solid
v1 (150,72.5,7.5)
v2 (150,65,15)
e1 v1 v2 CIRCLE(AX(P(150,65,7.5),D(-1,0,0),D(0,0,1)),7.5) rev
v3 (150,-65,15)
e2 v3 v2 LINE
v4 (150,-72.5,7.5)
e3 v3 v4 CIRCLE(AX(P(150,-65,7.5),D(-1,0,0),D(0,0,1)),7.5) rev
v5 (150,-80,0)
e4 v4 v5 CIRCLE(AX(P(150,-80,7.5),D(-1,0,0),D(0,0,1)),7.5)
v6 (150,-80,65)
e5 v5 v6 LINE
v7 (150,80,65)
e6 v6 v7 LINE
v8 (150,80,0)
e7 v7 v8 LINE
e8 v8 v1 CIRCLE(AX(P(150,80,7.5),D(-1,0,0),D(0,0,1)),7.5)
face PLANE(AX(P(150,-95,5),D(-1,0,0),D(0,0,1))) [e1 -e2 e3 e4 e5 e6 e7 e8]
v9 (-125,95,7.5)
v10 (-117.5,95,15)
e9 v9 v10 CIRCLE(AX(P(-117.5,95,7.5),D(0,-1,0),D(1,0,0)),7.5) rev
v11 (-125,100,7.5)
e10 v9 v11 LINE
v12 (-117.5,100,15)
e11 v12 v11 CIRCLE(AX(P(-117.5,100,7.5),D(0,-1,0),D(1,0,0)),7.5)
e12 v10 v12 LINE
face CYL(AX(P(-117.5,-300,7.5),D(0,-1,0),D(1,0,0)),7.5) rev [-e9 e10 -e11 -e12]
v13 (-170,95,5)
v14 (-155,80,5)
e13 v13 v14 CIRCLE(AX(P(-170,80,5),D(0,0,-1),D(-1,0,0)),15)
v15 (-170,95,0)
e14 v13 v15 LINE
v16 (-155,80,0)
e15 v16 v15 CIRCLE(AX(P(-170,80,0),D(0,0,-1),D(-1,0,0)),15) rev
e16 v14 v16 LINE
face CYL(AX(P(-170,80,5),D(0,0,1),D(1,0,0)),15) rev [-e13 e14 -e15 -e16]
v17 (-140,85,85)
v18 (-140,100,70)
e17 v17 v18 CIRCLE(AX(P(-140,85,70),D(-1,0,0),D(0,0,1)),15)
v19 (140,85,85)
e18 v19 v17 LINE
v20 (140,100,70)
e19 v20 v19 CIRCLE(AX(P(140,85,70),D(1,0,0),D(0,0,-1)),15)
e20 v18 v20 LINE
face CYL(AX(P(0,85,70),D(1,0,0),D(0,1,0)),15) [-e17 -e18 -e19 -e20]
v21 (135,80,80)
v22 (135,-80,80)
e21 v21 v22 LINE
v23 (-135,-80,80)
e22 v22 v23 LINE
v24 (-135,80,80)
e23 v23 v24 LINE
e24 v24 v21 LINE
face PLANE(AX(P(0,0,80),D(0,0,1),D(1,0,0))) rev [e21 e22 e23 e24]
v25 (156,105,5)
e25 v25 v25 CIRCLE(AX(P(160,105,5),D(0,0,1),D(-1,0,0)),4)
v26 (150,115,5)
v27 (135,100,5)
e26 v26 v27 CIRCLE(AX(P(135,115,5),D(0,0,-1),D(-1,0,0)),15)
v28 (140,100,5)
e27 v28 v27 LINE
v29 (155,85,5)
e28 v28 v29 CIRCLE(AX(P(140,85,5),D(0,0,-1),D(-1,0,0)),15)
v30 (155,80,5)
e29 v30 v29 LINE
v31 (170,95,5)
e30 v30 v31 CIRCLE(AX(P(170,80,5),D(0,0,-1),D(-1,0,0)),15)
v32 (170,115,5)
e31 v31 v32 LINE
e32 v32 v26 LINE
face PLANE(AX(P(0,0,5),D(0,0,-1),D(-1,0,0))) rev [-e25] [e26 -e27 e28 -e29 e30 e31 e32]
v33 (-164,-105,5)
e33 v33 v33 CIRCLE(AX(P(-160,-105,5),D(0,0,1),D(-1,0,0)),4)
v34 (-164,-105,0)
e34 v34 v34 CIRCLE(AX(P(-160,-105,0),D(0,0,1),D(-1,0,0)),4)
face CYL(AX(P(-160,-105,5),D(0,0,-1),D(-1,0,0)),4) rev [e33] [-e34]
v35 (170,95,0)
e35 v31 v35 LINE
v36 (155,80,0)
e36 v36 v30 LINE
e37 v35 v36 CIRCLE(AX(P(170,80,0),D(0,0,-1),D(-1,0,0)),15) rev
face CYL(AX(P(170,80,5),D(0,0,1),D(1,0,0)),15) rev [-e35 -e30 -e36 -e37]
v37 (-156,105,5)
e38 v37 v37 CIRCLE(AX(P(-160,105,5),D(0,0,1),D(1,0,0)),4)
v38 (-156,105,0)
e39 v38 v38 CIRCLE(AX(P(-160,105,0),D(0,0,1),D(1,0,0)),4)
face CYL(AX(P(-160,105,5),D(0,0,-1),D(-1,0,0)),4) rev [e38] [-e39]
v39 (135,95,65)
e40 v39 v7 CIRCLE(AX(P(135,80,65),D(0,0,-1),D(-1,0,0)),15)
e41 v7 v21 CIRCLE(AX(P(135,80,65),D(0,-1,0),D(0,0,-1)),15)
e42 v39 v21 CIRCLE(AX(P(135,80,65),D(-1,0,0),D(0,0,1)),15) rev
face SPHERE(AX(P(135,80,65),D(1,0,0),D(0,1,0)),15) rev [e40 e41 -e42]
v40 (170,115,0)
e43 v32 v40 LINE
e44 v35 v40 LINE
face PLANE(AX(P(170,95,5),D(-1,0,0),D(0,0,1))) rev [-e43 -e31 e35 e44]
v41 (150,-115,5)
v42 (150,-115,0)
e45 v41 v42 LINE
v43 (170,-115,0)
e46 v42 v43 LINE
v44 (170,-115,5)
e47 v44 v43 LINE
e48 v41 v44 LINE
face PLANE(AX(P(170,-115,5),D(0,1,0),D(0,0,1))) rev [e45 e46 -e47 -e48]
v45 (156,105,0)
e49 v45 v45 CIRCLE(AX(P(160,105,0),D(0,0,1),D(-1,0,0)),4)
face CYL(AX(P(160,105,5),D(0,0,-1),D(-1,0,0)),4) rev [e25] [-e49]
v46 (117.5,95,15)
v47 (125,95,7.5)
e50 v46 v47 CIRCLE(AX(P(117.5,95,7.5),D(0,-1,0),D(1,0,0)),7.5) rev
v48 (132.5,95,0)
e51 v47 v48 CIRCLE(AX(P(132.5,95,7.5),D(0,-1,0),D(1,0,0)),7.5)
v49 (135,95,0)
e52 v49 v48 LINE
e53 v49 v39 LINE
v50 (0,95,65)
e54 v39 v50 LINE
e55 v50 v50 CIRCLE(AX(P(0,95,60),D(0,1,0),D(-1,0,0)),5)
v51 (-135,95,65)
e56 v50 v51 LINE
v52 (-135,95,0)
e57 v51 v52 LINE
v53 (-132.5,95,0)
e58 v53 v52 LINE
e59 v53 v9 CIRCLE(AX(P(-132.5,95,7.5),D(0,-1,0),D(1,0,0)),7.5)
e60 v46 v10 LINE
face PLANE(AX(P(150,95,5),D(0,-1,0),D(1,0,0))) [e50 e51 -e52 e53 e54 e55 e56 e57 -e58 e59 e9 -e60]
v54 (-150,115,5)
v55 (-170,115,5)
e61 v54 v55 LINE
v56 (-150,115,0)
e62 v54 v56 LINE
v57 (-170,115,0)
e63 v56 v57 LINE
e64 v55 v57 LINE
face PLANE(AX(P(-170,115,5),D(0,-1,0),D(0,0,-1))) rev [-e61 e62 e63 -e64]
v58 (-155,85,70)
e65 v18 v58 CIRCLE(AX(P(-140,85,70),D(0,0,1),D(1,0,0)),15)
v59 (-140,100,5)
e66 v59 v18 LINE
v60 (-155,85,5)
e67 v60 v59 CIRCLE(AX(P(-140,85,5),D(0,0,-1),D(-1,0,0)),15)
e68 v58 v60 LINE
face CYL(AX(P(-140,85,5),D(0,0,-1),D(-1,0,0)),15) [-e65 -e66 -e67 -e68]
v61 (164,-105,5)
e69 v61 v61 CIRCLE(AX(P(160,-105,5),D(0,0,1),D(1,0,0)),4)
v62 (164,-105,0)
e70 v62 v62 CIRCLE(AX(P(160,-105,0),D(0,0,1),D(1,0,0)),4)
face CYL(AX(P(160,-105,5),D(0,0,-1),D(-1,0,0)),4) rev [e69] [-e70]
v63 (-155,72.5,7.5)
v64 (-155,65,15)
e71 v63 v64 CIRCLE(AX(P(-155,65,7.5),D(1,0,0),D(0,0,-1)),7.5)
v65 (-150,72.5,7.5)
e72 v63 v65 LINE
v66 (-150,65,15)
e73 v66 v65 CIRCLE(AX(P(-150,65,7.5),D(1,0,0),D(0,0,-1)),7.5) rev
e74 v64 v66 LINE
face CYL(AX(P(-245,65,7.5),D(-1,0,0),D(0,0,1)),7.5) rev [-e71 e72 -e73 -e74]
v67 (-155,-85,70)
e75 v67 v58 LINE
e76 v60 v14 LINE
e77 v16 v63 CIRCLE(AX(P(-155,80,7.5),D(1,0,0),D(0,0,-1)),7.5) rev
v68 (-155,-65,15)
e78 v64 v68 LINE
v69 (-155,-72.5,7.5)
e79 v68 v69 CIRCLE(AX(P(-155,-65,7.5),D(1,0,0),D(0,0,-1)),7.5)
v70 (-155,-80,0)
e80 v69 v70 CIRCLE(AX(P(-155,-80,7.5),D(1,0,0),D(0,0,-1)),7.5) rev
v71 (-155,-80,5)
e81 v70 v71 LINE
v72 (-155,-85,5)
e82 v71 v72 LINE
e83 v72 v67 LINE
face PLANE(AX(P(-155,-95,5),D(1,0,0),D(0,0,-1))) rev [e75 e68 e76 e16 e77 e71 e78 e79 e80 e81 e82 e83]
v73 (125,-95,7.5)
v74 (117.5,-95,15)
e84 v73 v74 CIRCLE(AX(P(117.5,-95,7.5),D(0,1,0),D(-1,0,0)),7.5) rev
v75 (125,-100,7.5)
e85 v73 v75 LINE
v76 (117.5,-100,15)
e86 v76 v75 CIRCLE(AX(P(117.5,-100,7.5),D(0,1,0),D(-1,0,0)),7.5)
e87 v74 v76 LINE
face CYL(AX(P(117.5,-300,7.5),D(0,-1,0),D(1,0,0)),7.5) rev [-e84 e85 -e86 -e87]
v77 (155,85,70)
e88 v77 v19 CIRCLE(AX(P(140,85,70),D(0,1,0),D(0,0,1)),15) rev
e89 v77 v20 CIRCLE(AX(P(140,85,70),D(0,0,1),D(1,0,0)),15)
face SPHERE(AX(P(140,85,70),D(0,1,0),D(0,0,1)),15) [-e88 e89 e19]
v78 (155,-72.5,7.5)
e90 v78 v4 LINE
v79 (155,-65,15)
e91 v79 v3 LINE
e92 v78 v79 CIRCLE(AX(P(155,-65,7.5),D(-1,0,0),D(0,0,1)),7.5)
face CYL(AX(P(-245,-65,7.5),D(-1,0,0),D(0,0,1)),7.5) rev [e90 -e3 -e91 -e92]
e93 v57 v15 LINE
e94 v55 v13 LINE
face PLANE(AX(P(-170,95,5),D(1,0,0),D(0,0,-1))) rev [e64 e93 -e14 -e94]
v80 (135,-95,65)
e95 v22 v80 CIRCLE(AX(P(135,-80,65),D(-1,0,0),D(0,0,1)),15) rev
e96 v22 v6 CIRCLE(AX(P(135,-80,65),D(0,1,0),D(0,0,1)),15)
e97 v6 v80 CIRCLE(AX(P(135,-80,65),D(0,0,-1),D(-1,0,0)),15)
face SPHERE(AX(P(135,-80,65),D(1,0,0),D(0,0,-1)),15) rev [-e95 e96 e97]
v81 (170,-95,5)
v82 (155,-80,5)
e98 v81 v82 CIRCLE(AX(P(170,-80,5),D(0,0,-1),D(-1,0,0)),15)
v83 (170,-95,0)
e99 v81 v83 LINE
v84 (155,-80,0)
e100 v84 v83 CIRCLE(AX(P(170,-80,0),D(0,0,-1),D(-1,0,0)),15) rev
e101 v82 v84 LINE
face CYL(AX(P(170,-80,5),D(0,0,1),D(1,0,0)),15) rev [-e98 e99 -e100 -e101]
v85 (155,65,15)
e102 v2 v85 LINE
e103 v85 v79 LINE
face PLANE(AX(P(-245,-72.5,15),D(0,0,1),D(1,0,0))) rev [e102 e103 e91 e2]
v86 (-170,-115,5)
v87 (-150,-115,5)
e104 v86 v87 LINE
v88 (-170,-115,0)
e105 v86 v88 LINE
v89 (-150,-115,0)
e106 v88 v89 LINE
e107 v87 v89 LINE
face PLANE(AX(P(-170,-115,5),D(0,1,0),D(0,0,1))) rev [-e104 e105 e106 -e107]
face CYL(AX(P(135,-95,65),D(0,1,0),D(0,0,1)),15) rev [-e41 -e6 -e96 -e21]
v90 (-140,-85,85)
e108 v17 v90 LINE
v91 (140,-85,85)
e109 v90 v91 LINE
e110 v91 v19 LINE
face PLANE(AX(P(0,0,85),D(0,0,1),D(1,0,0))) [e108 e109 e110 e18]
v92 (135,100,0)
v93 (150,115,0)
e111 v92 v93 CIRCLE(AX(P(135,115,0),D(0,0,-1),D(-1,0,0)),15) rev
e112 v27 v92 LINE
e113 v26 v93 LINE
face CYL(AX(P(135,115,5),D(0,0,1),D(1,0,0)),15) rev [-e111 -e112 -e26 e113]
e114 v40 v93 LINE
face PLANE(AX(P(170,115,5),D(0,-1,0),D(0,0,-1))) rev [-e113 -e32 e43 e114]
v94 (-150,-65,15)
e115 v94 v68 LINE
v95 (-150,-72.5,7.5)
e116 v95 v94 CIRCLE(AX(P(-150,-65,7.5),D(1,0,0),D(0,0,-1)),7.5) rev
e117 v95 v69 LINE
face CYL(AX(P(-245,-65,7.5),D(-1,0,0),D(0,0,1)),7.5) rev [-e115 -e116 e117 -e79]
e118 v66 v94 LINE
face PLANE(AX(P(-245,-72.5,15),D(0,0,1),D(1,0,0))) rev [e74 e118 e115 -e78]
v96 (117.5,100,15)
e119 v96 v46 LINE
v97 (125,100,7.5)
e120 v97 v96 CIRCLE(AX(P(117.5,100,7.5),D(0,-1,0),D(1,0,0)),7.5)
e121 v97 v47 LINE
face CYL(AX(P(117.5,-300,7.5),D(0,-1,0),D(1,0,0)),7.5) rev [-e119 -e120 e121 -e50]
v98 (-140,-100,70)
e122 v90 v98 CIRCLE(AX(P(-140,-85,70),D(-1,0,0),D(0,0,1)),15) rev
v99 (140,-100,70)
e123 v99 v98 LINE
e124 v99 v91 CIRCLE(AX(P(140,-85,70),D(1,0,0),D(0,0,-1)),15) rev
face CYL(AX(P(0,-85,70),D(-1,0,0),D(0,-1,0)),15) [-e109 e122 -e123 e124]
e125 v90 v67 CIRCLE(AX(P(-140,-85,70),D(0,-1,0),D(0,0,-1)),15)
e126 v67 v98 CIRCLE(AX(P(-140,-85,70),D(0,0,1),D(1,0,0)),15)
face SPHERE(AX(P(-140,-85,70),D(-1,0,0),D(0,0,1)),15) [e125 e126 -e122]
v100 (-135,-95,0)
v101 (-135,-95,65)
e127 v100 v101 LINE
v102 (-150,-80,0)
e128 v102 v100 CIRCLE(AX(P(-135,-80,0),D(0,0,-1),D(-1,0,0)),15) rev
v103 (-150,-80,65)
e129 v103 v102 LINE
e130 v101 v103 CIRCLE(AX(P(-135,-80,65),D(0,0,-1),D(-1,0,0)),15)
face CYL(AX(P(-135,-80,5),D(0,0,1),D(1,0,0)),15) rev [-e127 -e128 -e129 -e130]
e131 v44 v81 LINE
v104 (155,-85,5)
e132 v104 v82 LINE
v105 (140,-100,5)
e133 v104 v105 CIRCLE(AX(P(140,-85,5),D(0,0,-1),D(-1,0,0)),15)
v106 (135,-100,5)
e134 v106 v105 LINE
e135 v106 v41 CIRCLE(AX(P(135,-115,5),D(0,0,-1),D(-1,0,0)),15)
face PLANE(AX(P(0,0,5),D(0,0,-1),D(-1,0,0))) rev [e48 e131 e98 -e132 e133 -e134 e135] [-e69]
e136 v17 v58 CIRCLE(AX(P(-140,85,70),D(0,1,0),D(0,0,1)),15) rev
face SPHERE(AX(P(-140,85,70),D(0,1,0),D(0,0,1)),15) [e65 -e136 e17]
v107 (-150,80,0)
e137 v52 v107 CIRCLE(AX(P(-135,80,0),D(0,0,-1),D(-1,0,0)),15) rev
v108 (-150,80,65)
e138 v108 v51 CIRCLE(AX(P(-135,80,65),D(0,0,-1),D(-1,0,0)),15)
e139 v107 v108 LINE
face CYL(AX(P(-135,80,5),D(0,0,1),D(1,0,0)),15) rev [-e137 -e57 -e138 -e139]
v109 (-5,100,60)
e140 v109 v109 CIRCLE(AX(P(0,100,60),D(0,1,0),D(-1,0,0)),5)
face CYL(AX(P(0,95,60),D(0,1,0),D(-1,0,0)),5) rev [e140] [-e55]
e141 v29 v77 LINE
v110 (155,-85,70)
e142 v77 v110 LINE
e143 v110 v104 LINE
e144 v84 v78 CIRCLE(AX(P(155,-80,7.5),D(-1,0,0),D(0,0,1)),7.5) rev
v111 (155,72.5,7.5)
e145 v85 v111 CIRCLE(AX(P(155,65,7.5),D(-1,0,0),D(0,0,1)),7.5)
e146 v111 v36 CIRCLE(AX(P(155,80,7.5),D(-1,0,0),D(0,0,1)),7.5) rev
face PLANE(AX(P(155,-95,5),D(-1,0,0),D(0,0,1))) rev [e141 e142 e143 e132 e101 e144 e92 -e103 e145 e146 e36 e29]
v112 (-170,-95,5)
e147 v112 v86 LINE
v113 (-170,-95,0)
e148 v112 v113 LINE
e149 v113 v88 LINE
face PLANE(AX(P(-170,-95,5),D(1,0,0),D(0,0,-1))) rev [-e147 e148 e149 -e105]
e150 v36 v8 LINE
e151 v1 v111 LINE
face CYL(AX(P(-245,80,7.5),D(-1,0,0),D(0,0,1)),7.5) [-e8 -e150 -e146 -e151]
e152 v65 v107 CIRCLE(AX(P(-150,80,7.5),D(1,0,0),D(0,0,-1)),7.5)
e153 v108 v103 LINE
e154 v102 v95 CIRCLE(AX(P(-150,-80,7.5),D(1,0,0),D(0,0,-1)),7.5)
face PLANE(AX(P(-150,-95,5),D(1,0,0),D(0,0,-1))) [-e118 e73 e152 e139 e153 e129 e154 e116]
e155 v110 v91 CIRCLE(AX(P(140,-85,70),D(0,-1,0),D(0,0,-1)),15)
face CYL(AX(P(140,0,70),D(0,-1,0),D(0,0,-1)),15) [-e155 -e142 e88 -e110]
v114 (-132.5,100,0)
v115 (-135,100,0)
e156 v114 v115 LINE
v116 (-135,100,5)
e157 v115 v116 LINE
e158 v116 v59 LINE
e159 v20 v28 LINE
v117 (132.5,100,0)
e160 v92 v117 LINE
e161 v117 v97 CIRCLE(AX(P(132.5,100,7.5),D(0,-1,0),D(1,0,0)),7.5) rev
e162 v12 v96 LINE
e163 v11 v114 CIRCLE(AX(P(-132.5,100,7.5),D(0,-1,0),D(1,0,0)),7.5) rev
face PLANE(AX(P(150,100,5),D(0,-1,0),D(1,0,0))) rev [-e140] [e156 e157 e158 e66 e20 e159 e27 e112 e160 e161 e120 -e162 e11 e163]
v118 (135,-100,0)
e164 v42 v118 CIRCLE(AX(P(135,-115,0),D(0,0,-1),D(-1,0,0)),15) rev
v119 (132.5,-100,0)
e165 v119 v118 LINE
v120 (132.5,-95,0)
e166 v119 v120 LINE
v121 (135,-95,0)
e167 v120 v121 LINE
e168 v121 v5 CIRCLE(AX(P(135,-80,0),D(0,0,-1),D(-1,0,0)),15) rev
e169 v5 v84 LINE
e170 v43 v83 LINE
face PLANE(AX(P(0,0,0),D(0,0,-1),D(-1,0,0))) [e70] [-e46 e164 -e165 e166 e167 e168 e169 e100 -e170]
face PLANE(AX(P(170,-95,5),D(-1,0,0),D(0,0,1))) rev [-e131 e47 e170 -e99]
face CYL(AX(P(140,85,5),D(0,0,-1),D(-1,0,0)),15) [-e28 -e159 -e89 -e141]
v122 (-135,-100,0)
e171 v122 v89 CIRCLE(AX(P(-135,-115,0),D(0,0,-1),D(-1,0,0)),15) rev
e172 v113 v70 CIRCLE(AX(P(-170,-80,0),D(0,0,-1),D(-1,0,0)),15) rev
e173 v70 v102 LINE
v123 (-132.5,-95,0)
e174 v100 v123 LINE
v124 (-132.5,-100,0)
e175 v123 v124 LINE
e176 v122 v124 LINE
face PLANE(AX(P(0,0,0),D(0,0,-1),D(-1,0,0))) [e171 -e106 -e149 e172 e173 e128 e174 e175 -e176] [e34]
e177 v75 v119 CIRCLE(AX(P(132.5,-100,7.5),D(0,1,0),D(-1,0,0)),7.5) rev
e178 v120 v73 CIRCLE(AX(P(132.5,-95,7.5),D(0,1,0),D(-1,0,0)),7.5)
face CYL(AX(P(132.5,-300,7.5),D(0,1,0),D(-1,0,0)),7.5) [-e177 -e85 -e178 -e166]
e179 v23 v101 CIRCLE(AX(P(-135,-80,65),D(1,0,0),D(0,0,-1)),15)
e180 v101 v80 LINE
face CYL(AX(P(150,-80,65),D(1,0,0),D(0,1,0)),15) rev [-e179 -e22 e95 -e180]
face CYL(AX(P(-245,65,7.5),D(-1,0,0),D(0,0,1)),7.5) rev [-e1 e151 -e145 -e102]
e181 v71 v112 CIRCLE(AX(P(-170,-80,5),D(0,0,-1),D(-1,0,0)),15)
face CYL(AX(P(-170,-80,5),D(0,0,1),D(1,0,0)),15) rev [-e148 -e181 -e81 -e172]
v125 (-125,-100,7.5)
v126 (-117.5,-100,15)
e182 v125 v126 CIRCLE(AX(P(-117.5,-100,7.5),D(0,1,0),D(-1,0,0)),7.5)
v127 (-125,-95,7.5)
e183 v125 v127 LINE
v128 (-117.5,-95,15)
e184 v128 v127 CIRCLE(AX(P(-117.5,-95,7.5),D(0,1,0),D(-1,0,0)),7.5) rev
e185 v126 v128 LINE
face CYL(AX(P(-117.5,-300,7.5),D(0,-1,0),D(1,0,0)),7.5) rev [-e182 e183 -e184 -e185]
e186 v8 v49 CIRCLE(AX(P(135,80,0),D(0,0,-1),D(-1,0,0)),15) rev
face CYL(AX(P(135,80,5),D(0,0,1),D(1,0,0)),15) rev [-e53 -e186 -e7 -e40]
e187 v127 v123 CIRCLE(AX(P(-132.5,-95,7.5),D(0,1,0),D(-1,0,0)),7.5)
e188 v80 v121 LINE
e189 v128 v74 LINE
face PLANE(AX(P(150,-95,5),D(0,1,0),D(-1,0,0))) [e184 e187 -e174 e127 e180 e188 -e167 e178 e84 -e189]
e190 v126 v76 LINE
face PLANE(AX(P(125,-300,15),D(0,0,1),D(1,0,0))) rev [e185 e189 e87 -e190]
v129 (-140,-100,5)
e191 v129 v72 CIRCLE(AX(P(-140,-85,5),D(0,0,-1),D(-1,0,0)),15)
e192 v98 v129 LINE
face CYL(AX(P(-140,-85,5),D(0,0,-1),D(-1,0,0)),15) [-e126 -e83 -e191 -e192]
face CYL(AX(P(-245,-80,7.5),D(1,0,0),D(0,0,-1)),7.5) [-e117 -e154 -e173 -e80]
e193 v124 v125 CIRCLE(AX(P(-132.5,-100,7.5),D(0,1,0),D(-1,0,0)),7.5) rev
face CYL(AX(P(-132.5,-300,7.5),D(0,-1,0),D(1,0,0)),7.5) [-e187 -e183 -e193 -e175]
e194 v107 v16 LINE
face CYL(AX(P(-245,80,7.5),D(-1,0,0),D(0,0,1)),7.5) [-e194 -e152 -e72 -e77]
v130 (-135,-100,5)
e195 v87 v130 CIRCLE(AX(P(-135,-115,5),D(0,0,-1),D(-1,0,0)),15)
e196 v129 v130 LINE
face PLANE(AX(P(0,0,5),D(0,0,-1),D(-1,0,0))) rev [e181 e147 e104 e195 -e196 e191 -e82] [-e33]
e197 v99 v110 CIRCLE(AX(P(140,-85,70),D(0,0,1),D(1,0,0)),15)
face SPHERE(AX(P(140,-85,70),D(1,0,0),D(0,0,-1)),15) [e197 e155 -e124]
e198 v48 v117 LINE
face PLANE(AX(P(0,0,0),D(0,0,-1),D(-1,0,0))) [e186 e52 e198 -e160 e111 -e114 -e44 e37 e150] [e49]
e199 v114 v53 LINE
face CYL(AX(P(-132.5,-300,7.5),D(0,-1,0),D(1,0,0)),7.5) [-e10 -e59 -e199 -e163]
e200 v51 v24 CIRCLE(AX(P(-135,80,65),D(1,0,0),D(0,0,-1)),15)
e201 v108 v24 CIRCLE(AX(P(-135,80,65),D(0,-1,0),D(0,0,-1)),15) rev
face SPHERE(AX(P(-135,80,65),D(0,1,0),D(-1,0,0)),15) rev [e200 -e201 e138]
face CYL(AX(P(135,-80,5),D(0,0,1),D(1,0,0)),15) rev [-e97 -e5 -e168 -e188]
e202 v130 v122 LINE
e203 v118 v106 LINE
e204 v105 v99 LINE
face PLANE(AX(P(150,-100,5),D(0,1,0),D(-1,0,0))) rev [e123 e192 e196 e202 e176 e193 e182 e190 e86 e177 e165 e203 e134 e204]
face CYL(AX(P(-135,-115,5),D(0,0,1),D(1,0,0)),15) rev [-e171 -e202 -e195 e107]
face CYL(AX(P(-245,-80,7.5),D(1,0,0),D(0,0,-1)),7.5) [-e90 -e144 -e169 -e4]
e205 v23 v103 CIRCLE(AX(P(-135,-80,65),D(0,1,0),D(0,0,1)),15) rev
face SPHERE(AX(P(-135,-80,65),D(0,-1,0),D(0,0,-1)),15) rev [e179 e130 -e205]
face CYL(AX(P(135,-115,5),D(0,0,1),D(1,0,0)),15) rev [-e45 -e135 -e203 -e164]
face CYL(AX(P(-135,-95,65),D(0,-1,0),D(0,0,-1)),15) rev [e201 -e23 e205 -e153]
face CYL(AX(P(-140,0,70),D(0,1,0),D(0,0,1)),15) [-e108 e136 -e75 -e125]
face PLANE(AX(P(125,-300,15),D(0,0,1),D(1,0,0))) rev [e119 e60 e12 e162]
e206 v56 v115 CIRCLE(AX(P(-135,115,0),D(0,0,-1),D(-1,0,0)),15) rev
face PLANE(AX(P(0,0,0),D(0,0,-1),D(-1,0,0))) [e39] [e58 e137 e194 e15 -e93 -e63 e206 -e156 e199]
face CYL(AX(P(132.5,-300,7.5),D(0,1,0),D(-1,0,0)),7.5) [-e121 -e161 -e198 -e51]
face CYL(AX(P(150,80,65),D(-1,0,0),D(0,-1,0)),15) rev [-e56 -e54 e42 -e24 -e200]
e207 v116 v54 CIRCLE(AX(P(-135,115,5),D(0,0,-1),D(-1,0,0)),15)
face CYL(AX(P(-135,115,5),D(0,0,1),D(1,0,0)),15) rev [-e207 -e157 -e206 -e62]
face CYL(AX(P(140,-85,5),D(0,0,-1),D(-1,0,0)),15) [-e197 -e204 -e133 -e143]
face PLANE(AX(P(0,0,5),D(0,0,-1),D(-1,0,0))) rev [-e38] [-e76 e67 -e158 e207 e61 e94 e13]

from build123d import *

# Parameters (mm, degrees)
SKETCH2_R           = 4
SKETCH2_W           = 300
SKETCH2_H           = 190
BOSS_EXTRUDE1_DEPTH = 5
SKETCH3_W           = 310
SKETCH3_H           = 200
SKETCH3_W_2         = 300
SKETCH3_H_2         = 190
BOSS_EXTRUDE2_DEPTH = 75
SKETCH4_W           = 310
SKETCH4_H           = 200
BOSS_EXTRUDE3_DEPTH = 5
FILLET2_R           = 15
FILLET3_R           = 15
FILLET4_R           = 15
SKETCH5_R           = 5
CUT_EXTRUDE1_DEPTH  = 5
SKETCH6_W           = 250
SKETCH6_H           = 30
CUT_EXTRUDE2_DEPTH  = 400
SKETCH7_W           = 30
SKETCH7_H           = 145
CUT_EXTRUDE3_DEPTH  = 400
FILLET5_START       = -155
FILLET5_DEPTH       = 5
FILLET5_START_2     = 150
FILLET5_2_DEPTH     = 5
FILLET5_START_3     = -100
FILLET5_3_DEPTH     = 5
FILLET5_START_4     = 95
FILLET5_4_DEPTH     = 5
FILLET5_START_5     = -170
FILLET5_5_DEPTH     = 340
FILLET5_START_6     = -115
FILLET5_6_DEPTH     = 230


with BuildPart() as part:
    # Sketch2 → Boss-Extrude1 (new body)
    with BuildSketch(Plane.XY):
        Polygon((150, -100), (-150, -100), (-150, -115), (-170, -115), (-170, -95), (-155, -95), (-155, 95), (-170, 95), (-170, 115), (-150, 115), (-150, 100), (150, 100), (150, 115), (170, 115), (170, 95), (155, 95), (155, -95), (170, -95), (170, -115), (150, -115), align=None)
        with Locations((-160, 105)):
            Circle(SKETCH2_R, mode=Mode.SUBTRACT)
        with Locations(Location((160, 105, 0), (0, 0, 180))):
            Circle(SKETCH2_R, mode=Mode.SUBTRACT)
        with Locations((160, -105)):
            Circle(SKETCH2_R, mode=Mode.SUBTRACT)
        with Locations(Location((-160, -105, 0), (0, 0, 180))):
            Circle(SKETCH2_R, mode=Mode.SUBTRACT)
        Rectangle(SKETCH2_W, SKETCH2_H, mode=Mode.SUBTRACT)
    extrude(amount=BOSS_EXTRUDE1_DEPTH)

    # Sketch3 → Boss-Extrude2 (add)
    with BuildSketch(Plane.XY.offset(5)):
        Rectangle(SKETCH3_W, SKETCH3_H)
        Rectangle(SKETCH3_W_2, SKETCH3_H_2, mode=Mode.SUBTRACT)
    extrude(amount=BOSS_EXTRUDE2_DEPTH)

    # Sketch4 → Boss-Extrude3 (add)
    with BuildSketch(Plane.XY.offset(80)):
        Rectangle(SKETCH4_W, SKETCH4_H)
    extrude(amount=BOSS_EXTRUDE3_DEPTH)

    # Fillet2
    fillet2_edges = [part.edges().sort_by_distance(p)[0] for p in [
        (-150, 0, 80),
        (0, -95, 80),
        (150, 0, 80),
        (0, 95, 80),
        (150, -95, 40),
        (150, 95, 40),
        (-150, 95, 40),
        (-150, -95, 40),
    ]]
    fillet(fillet2_edges, radius=FILLET2_R)

    # Fillet3
    fillet3_edges = [part.edges().sort_by_distance(p)[0] for p in [
        (-155, -95, 2.5),
        (-150, -100, 2.5),
        (150, -100, 2.5),
        (155, -95, 2.5),
        (155, 95, 2.5),
        (150, 100, 2.5),
        (-155, 95, 2.5),
        (-150, 100, 2.5),
    ]]
    fillet(fillet3_edges, radius=FILLET3_R - 0.0001)  # a hair under: the kernel refuses the full size

    # Fillet4
    fillet4_edges = [part.edges().sort_by_distance(p)[0] for p in [
        (155, -100, 45),
        (155, 100, 45),
        (-155, 0, 85),
        (0, -100, 85),
        (155, 0, 85),
        (0, 100, 85),
        (-155, 100, 45),
        (-155, -100, 45),
    ]]
    fillet(fillet4_edges, radius=FILLET4_R)

    # Sketch5 → Cut-Extrude1 (cut)
    with BuildSketch(Plane(origin=(0, 100, 0), x_dir=(1, 0, 0), z_dir=(0, 1, 0))):
        with Locations(Location((0, -60, 0), (0, 0, 180))):
            Circle(SKETCH5_R)
    extrude(amount=-CUT_EXTRUDE1_DEPTH, mode=Mode.SUBTRACT)

    # Sketch6 → Cut-Extrude2 (cut)
    with BuildSketch(Plane(origin=(0, 100, 0), x_dir=(1, 0, 0), z_dir=(0, 1, 0))):
        Rectangle(SKETCH6_W, SKETCH6_H)
    extrude(amount=-CUT_EXTRUDE2_DEPTH, mode=Mode.SUBTRACT)

    # Sketch7 → Cut-Extrude3 (cut)
    with BuildSketch(Plane(origin=(155, 0, 0), x_dir=(0, 0, -1), z_dir=(1, 0, 0))):
        Rectangle(SKETCH7_W, SKETCH7_H)
    extrude(amount=-CUT_EXTRUDE3_DEPTH, mode=Mode.SUBTRACT)

    # Fillet5: read off the stored shape, not the designer's step
    # Fillet5 outline → Fillet5 (add)
    with BuildSketch(Plane.YZ.offset(FILLET5_START)):
        with BuildLine():
            Line((72.5, 15), (65, 15))
            ThreePointArc((65, 15), (70.303300859, 12.803300859), (72.5, 7.5))
            Line((72.5, 7.5), (72.5, 15))
        make_face()
        with BuildLine():
            Line((-72.5, 15), (-72.5, 7.5))
            ThreePointArc((-72.5, 7.5), (-70.303300859, 12.803300859), (-65, 15))
            Line((-65, 15), (-72.5, 15))
        make_face()
    extrude(amount=FILLET5_DEPTH)

    # Fillet5 2 outline → Fillet5 2 (add)
    with BuildSketch(Plane.YZ.offset(FILLET5_START_2)):
        with BuildLine():
            Line((72.5, 15), (65, 15))
            ThreePointArc((65, 15), (70.303300859, 12.803300859), (72.5, 7.5))
            Line((72.5, 7.5), (72.5, 15))
        make_face()
        with BuildLine():
            Line((-72.5, 15), (-72.5, 7.5))
            ThreePointArc((-72.5, 7.5), (-70.303300859, 12.803300859), (-65, 15))
            Line((-65, 15), (-72.5, 15))
        make_face()
    extrude(amount=FILLET5_2_DEPTH)

    # Fillet5 3 outline → Fillet5 3 (add)
    with BuildSketch(Plane(origin=(0, 0, 0), x_dir=(1, 0, 0), z_dir=(0, 1, 0)).offset(FILLET5_START_3)):
        with BuildLine():
            ThreePointArc((125, -7.5), (122.803300859, -12.803300859), (117.5, -15))
            Line((117.5, -15), (125, -15))
            Line((125, -15), (125, -7.5))
        make_face()
        with BuildLine():
            ThreePointArc((-117.5, -15), (-122.803300859, -12.803300859), (-125, -7.5))
            Line((-125, -7.5), (-125, -15))
            Line((-125, -15), (-117.5, -15))
        make_face()
    extrude(amount=FILLET5_3_DEPTH)

    # Fillet5 4 outline → Fillet5 4 (add)
    with BuildSketch(Plane(origin=(0, 0, 0), x_dir=(1, 0, 0), z_dir=(0, 1, 0)).offset(FILLET5_START_4)):
        with BuildLine():
            ThreePointArc((125, -7.5), (122.803300859, -12.803300859), (117.5, -15))
            Line((117.5, -15), (125, -15))
            Line((125, -15), (125, -7.5))
        make_face()
        with BuildLine():
            ThreePointArc((-117.5, -15), (-122.803300859, -12.803300859), (-125, -7.5))
            Line((-125, -7.5), (-125, -15))
            Line((-125, -15), (-117.5, -15))
        make_face()
    extrude(amount=FILLET5_4_DEPTH)

    # Fillet5 5 outline → Fillet5 5 (cut)
    with BuildSketch(Plane.YZ.offset(FILLET5_START_5)):
        with BuildLine():
            ThreePointArc((80, 0), (74.696699141, 2.196699141), (72.5, 7.5))
            Line((72.5, 7.5), (72.5, 0))
            Line((72.5, 0), (80, 0))
        make_face()
        with BuildLine():
            ThreePointArc((-72.5, 7.5), (-74.696699141, 2.196699141), (-80, 0))
            Line((-80, 0), (-72.5, 0))
            Line((-72.5, 0), (-72.5, 7.5))
        make_face()
    extrude(amount=FILLET5_5_DEPTH, mode=Mode.SUBTRACT)

    # Fillet5 6 outline → Fillet5 6 (cut)
    with BuildSketch(Plane(origin=(0, 0, 0), x_dir=(1, 0, 0), z_dir=(0, 1, 0)).offset(FILLET5_START_6)):
        with BuildLine():
            Line((-125, 0), (-132.5, 0))
            ThreePointArc((-132.5, 0), (-127.196699141, -2.196699141), (-125, -7.5))
            Line((-125, -7.5), (-125, 0))
        make_face()
        with BuildLine():
            Line((125, 0), (125, -7.5))
            ThreePointArc((125, -7.5), (127.196699141, -2.196699141), (132.5, 0))
            Line((132.5, 0), (125, 0))
        make_face()
    extrude(amount=FILLET5_6_DEPTH, mode=Mode.SUBTRACT)


solid = part.part
